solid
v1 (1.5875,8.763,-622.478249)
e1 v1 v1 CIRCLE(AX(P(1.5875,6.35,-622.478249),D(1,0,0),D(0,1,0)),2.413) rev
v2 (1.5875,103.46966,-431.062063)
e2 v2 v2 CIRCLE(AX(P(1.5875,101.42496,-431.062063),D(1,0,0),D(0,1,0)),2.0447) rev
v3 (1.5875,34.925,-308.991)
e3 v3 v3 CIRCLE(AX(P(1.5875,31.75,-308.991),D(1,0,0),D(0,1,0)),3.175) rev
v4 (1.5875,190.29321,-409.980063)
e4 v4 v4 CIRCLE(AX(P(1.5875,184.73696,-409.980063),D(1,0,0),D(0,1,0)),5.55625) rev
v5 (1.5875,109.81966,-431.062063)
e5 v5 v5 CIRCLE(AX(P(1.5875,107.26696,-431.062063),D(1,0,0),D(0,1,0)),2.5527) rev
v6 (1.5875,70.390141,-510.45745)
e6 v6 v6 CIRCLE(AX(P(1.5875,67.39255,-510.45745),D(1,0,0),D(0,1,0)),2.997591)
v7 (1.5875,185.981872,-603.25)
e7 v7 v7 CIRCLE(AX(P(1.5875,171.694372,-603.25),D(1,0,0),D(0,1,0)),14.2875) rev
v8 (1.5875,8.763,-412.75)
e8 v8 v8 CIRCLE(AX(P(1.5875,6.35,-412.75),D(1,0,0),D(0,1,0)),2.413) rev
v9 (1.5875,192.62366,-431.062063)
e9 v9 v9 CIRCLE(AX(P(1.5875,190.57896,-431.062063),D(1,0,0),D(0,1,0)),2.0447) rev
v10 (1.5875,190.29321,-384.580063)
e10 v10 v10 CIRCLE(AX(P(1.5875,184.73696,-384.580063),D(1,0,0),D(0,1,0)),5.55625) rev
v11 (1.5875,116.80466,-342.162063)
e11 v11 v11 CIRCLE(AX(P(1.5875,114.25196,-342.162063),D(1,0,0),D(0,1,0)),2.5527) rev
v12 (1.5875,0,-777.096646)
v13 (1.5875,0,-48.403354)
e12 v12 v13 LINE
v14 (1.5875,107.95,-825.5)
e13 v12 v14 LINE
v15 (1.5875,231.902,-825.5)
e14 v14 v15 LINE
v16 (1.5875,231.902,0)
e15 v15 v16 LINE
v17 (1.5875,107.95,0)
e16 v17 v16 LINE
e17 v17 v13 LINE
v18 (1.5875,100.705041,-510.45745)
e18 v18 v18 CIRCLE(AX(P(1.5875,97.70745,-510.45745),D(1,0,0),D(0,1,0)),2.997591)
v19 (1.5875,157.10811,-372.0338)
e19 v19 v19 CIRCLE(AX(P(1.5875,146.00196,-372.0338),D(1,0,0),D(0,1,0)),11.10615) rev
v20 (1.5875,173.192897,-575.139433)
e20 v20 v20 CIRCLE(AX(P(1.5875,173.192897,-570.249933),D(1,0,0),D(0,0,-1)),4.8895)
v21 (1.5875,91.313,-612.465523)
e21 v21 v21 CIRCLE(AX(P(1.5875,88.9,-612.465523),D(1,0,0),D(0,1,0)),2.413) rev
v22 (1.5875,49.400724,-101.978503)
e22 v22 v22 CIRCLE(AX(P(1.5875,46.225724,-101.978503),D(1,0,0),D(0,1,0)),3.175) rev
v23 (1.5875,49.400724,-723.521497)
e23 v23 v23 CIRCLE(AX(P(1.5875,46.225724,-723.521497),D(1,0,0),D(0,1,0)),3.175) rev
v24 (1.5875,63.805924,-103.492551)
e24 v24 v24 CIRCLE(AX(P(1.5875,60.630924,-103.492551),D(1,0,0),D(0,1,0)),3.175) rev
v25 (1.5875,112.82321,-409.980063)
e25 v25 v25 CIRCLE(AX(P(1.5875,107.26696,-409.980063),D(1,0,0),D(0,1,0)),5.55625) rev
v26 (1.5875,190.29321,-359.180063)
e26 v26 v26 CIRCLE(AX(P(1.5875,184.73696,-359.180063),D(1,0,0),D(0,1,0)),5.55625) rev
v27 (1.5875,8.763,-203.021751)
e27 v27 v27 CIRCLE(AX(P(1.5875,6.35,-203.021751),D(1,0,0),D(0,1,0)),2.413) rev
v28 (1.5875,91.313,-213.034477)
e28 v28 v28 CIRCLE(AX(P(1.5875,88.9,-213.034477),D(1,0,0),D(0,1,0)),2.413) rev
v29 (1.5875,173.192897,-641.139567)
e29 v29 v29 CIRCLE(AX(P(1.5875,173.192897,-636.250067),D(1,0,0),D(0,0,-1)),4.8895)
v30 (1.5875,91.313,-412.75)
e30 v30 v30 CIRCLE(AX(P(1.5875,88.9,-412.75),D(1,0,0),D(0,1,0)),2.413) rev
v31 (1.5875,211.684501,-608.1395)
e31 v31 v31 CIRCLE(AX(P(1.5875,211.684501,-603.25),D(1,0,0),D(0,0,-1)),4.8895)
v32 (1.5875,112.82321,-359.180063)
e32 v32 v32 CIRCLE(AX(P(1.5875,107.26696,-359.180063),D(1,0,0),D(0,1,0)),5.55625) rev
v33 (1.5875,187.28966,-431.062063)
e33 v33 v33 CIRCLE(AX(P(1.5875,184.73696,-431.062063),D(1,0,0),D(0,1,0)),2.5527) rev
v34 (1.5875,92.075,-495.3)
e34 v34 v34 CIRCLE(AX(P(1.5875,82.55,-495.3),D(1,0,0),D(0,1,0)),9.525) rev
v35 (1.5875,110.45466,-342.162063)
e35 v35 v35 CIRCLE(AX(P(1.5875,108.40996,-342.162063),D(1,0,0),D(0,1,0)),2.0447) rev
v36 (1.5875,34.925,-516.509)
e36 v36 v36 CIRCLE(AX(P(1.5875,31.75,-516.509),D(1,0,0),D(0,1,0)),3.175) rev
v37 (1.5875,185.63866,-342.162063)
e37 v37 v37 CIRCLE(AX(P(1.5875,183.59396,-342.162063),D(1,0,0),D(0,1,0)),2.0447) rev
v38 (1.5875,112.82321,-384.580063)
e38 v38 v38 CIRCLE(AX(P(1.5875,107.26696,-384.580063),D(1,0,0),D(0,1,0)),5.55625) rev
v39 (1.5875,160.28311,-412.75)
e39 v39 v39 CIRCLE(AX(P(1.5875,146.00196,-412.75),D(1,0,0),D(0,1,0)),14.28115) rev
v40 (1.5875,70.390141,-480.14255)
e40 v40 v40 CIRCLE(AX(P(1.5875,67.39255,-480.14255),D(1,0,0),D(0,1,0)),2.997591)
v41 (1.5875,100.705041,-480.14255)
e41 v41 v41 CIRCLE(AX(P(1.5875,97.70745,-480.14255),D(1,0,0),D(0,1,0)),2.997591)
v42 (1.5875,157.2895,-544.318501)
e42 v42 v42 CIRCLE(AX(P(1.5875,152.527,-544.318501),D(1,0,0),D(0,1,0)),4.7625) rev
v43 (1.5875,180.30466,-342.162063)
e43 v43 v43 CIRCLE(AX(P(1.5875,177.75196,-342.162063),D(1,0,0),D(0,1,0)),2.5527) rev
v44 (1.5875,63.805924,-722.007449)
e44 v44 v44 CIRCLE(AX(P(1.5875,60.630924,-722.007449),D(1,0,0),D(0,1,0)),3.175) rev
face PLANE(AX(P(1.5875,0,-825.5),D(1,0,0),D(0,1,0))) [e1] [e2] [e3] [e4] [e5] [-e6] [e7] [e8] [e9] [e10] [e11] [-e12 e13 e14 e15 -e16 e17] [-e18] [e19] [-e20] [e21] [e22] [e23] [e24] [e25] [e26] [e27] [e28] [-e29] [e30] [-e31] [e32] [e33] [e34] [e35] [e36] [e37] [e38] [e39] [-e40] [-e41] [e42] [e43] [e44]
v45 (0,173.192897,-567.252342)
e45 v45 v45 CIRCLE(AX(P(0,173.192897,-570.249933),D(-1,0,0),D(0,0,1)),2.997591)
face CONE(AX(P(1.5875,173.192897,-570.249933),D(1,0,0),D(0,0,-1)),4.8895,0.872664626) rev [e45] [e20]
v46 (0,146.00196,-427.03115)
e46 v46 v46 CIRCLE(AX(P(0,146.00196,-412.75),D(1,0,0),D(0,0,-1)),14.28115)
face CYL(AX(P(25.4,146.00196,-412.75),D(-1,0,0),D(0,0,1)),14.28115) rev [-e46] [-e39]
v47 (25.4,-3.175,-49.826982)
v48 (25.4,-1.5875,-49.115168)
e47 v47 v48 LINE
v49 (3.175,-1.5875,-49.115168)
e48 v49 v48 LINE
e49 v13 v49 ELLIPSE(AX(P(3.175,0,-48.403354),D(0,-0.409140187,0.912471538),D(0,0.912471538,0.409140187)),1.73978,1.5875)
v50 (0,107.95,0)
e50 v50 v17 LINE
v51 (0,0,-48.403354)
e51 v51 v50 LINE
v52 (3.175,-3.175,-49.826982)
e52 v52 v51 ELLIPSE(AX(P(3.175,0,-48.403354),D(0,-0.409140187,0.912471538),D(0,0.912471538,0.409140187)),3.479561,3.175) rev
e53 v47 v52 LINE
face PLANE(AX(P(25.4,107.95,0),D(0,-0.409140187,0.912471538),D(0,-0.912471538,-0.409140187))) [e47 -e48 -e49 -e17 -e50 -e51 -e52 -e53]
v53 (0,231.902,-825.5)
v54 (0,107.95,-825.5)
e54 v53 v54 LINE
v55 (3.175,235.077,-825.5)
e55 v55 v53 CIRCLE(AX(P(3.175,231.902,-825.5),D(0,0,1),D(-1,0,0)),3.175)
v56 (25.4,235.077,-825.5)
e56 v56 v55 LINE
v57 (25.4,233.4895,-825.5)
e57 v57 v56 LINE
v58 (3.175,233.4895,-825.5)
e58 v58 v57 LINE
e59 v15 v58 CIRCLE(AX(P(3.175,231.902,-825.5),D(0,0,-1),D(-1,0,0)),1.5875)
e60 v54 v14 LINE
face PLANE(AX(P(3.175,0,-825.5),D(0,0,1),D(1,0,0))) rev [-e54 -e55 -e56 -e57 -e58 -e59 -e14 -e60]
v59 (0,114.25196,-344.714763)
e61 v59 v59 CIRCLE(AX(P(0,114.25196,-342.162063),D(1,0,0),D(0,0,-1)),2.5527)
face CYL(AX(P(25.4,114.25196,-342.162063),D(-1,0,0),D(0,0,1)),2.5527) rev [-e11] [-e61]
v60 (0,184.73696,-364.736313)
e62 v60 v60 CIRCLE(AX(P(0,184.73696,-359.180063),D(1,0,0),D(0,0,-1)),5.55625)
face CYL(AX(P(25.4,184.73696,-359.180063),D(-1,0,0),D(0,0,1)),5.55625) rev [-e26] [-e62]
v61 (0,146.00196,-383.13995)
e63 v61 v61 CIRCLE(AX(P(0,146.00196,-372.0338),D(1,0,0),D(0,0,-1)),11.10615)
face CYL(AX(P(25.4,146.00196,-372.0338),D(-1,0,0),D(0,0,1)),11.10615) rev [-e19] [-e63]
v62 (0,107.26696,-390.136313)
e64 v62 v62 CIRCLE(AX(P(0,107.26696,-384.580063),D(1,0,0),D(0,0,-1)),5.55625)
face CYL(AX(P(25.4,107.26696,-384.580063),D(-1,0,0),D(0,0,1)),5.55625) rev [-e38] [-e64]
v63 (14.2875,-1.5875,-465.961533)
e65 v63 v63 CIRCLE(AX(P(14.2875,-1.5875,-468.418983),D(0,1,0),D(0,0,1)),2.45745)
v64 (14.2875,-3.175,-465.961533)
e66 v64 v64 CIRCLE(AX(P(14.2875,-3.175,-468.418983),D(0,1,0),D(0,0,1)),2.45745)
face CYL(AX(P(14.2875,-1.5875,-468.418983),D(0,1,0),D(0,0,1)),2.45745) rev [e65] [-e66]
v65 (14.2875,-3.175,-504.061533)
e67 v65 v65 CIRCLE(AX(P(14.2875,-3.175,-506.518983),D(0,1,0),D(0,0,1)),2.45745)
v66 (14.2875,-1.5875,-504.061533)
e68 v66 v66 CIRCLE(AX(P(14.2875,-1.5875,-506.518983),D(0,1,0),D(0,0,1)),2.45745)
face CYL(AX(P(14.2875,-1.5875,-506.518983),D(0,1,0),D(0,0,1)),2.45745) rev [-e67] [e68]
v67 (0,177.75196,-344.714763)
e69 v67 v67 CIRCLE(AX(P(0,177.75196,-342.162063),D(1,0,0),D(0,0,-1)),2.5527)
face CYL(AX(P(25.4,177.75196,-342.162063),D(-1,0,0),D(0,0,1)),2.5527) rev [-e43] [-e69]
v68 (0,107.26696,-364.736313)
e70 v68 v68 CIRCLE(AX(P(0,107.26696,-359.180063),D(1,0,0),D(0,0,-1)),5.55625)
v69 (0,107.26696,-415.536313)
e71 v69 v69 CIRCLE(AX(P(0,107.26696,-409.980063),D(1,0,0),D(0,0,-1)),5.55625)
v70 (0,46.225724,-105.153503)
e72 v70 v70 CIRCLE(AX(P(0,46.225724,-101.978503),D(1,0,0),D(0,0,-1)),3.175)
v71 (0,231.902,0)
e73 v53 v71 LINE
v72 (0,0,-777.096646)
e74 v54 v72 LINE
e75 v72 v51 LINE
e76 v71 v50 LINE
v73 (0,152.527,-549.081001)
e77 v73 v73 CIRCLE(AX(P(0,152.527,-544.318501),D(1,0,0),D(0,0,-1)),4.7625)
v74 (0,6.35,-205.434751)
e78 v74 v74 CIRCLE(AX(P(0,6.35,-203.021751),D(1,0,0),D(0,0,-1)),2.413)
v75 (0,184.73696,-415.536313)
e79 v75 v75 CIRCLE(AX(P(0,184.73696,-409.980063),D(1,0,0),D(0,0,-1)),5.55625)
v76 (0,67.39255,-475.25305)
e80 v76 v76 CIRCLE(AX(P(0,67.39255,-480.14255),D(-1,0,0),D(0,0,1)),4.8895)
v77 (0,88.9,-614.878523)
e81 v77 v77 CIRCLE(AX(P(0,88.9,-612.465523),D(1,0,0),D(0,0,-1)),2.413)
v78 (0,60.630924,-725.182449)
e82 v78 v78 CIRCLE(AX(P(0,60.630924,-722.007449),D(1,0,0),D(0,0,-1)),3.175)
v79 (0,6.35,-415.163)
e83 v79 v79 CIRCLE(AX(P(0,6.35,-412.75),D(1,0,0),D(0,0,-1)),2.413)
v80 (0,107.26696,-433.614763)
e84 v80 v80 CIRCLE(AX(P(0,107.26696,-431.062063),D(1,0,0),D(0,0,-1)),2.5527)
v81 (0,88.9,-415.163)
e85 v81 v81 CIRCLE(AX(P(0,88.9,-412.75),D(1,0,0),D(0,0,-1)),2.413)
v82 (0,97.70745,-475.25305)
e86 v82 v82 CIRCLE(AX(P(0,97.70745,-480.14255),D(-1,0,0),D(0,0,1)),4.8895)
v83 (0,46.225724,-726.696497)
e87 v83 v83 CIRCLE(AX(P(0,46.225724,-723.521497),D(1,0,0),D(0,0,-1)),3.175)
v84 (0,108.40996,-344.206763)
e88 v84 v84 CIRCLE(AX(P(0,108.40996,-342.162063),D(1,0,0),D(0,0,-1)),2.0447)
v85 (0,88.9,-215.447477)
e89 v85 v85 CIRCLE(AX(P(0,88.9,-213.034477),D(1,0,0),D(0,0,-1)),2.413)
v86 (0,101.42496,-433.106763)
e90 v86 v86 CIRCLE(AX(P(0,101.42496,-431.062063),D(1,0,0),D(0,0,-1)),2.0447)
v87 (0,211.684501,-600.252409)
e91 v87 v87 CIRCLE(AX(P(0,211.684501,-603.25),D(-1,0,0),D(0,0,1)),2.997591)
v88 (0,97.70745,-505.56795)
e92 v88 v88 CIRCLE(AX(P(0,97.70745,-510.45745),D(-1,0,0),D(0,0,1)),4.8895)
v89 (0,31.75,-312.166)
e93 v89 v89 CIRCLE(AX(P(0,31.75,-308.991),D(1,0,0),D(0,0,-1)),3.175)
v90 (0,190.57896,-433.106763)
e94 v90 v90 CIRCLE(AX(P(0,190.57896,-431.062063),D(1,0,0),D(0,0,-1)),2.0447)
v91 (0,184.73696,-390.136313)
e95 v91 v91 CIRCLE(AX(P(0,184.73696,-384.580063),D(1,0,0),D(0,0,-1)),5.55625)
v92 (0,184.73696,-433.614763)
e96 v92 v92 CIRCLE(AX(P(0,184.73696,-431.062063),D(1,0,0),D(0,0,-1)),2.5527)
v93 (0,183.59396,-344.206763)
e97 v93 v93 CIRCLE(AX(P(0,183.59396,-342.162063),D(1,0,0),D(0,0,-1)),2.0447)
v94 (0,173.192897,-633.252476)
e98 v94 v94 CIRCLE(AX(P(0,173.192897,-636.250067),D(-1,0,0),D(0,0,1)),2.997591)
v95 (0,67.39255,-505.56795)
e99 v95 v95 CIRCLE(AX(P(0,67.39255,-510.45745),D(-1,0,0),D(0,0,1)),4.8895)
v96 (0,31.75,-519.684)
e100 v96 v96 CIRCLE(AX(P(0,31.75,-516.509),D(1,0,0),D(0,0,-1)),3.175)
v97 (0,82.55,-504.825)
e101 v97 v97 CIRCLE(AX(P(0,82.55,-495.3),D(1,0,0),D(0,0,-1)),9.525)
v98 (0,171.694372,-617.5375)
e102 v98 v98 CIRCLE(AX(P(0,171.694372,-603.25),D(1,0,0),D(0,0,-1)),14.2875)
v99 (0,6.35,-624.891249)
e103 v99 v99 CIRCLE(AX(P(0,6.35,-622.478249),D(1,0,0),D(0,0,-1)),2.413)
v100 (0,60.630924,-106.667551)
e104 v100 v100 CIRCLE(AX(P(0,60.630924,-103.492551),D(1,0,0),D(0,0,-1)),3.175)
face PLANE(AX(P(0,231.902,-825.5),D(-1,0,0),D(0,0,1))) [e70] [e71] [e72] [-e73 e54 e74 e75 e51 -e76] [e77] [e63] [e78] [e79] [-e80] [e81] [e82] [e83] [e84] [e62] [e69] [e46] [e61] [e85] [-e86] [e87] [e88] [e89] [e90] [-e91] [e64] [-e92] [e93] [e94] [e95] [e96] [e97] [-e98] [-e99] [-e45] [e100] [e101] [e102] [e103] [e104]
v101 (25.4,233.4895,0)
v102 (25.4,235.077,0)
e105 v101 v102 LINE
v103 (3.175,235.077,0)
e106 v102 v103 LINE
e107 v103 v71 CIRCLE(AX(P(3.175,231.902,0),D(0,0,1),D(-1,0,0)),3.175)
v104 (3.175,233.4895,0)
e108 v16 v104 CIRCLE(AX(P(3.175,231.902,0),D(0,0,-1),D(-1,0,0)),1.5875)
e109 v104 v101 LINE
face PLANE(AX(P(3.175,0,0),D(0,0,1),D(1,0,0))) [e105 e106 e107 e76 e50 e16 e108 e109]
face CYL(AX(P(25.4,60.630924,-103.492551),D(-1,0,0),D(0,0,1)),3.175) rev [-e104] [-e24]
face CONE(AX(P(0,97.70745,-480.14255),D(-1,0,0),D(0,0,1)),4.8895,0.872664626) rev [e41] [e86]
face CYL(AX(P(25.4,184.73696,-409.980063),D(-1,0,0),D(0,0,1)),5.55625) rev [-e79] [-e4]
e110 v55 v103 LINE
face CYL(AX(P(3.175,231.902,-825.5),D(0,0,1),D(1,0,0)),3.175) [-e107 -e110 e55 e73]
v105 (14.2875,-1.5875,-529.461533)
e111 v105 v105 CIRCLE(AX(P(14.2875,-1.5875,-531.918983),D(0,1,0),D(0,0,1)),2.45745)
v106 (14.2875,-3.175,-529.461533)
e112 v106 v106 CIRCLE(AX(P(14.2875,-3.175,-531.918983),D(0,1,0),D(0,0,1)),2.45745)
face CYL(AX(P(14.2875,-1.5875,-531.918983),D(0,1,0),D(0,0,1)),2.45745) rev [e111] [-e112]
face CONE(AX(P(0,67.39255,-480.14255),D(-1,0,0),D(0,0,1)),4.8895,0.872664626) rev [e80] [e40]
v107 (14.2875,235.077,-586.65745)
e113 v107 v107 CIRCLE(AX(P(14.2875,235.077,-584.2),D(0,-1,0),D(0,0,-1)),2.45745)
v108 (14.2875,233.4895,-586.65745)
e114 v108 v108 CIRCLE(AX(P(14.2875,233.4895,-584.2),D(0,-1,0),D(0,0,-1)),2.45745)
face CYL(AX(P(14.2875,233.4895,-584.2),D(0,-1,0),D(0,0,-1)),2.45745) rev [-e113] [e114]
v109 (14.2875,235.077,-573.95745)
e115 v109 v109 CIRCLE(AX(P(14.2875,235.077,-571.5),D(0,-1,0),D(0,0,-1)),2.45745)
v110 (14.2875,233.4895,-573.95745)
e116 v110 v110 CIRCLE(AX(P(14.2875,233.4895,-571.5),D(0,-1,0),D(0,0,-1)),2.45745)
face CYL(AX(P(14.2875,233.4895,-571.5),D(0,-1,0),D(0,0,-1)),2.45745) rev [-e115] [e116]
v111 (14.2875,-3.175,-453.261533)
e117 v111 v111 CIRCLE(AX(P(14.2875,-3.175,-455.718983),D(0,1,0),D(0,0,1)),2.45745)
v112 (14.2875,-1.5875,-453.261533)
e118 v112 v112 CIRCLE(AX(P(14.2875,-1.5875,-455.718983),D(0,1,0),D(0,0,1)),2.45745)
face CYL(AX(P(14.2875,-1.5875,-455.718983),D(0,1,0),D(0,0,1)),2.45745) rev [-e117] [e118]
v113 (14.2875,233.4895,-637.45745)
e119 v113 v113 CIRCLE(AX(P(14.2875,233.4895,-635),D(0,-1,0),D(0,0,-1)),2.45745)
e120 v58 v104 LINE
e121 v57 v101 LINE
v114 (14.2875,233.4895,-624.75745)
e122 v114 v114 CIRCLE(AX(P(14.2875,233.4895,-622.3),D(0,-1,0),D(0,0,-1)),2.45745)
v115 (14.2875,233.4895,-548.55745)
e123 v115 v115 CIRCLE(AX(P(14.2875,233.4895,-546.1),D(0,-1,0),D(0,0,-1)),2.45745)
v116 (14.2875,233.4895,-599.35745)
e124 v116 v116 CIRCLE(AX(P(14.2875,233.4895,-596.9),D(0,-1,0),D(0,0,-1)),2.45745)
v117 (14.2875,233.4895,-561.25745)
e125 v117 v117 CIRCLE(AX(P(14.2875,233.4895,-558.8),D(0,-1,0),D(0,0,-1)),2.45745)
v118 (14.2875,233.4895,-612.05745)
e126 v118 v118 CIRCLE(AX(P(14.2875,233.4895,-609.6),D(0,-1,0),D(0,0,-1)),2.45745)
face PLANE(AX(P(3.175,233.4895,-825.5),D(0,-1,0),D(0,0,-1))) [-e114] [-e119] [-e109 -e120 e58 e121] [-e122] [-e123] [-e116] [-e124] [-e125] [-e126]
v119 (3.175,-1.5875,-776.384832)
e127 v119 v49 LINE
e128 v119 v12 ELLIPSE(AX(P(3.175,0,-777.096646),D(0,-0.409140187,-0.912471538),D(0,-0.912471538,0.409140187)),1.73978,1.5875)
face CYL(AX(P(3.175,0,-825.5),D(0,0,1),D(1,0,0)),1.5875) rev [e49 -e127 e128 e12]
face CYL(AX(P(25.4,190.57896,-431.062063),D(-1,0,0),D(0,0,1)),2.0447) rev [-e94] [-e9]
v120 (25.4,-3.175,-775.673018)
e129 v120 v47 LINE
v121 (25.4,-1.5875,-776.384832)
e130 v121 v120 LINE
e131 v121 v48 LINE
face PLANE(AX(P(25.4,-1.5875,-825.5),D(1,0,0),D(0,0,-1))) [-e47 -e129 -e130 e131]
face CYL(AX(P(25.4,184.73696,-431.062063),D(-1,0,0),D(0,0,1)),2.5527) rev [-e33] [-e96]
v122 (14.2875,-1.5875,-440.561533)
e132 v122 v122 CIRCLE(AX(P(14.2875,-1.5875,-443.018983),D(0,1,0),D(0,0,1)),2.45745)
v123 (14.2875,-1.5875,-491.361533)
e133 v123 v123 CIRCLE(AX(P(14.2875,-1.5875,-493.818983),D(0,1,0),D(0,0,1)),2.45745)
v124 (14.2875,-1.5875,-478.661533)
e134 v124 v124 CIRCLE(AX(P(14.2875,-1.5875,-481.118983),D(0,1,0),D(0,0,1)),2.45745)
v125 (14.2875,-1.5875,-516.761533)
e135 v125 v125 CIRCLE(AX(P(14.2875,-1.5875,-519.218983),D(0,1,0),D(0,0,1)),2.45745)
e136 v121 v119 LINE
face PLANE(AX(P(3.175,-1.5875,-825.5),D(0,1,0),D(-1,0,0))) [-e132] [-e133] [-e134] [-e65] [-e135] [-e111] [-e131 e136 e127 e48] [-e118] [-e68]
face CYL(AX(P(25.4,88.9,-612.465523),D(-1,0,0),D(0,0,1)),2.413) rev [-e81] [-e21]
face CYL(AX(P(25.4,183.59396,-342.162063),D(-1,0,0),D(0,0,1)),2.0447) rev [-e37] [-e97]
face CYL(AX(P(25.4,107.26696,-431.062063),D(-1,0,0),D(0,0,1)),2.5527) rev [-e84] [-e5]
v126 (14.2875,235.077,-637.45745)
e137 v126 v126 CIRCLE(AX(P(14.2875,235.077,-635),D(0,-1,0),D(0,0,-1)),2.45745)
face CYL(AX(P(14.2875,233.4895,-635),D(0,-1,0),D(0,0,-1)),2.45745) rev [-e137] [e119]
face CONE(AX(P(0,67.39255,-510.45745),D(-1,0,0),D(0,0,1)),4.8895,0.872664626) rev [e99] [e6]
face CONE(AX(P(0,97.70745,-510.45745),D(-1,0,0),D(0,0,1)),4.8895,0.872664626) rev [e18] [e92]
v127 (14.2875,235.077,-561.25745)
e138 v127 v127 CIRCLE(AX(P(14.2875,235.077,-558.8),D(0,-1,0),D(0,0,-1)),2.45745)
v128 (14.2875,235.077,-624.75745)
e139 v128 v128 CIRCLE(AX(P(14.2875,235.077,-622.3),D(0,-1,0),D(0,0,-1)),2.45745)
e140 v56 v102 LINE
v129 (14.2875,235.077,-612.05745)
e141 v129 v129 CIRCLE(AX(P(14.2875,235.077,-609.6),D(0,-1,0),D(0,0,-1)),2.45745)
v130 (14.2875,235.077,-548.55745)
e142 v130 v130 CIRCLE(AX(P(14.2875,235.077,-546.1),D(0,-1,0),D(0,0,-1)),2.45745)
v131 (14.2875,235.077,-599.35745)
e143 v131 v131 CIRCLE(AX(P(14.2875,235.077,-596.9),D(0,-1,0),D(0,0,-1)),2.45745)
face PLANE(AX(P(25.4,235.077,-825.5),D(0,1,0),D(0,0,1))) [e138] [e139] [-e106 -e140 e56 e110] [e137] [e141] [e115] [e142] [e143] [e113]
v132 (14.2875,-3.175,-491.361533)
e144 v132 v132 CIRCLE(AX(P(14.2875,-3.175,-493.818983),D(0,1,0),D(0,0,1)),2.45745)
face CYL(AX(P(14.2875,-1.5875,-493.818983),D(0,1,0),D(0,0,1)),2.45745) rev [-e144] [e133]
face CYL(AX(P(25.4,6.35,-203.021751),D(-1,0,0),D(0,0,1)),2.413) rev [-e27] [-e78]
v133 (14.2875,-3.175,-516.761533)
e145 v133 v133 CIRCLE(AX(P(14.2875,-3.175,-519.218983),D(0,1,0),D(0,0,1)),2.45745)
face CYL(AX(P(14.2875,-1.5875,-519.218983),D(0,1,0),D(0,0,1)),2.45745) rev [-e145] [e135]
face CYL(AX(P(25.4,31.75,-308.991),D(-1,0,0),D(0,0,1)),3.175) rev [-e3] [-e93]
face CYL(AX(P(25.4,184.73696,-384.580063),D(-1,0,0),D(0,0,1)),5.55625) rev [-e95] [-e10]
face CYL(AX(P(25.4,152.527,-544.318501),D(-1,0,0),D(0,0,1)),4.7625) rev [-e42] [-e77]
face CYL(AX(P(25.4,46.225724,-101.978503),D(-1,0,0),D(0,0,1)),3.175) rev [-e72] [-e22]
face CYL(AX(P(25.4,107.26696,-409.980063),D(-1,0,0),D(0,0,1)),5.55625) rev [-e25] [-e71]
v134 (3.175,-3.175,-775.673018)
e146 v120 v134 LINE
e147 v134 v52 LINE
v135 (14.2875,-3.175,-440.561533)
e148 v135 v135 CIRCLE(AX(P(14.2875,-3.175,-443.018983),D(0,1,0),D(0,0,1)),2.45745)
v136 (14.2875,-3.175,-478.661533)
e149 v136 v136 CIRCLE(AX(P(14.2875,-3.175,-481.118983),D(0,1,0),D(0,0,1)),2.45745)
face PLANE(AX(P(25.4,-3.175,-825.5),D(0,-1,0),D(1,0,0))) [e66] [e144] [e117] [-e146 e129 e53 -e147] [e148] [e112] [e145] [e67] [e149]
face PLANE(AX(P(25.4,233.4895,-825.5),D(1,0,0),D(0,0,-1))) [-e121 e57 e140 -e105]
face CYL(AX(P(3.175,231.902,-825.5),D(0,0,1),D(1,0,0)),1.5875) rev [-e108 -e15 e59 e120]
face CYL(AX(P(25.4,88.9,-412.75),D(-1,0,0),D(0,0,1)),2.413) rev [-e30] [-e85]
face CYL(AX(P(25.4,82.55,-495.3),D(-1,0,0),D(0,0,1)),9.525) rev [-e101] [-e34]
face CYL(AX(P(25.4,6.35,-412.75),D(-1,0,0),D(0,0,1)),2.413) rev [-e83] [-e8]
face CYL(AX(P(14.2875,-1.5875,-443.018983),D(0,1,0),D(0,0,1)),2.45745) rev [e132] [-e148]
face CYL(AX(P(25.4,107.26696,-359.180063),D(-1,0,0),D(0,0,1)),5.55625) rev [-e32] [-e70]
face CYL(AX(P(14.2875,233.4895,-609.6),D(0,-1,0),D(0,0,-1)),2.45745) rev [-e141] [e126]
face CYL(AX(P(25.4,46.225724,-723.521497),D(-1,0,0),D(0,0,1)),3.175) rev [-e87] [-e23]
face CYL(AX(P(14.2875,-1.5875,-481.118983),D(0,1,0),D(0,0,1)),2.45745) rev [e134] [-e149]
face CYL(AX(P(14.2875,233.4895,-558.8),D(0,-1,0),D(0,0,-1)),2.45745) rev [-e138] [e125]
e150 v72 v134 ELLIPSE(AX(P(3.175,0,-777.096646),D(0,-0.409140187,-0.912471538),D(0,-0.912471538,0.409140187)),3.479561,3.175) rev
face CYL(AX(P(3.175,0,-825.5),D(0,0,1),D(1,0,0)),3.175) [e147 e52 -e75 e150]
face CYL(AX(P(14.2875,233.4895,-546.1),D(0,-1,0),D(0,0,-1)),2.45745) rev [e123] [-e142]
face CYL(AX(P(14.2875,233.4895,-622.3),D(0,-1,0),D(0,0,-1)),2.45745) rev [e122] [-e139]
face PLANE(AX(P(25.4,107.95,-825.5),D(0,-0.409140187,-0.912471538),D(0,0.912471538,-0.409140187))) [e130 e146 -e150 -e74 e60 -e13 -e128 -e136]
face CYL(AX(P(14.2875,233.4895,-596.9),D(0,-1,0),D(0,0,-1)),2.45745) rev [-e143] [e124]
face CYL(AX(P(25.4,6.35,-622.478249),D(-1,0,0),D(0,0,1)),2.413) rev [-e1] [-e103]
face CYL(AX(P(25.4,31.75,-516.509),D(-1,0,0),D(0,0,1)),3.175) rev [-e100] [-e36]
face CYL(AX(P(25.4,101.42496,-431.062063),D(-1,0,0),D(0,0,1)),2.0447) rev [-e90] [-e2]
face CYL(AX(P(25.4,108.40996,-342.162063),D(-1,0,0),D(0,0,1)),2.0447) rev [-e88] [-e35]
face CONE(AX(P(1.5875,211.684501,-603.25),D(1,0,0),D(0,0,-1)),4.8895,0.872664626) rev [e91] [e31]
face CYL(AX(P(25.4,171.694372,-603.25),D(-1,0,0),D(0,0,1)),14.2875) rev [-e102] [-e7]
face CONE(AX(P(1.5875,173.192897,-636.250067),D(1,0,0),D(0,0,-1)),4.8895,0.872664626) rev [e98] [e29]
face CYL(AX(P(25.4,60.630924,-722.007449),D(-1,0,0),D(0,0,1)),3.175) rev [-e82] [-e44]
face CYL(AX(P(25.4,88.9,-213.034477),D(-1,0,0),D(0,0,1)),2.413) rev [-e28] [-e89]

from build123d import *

# Parameters (mm, degrees)
BASE_FLANGE2_DEPTH                                 = 825.5
SKETCH1_R                                          = 3.175
SKETCH1_R_2                                        = 2.413
SKETCH1_R_3                                        = 5.55625
SKETCH1_R_4                                        = 2.5527
SKETCH1_R_5                                        = 2.0447
SKETCH1_R_6                                        = 14.28115
SKETCH1_R_7                                        = 11.10615
SKETCH1_R_8                                        = 1.5875
SKETCH1_R_9                                        = 9.525
SKETCH1_R_10                                       = 1.27
SKETCH1_R_11                                       = 14.2875
SKETCH1_R_12                                       = 4.7625
CUT_EXTRUDE3_DEPTH                                 = 859.694710551
CSK_FOR_10_FLAT_HEAD_MACHINE_SCREW_100_D           = 4.9784
CSK_FOR_10_FLAT_HEAD_MACHINE_SCREW_100_CSINK_D     = 9.779
CSK_FOR_10_FLAT_HEAD_MACHINE_SCREW_100_CSINK_ANGLE = 100
CSK_FOR_10_FLAT_HEAD_MACHINE_SCREW_2_AT_COUNT      = 2
CSK_FOR_10_FLAT_HEAD_MACHINE_SCREW_2_AT_PITCH      = 50.701163977
CSK_FOR_10_FLAT_HEAD_MACHINE_SCREW_3_COUNT         = 2
CSK_FOR_10_FLAT_HEAD_MACHINE_SCREW_3_PITCH         = 50.701163977
SKETCH10_R                                         = 0.635
CUT_EXTRUDE4_DEPTH                                 = 860.130662682
F_8_CLEARANCE_HOLE1_D                              = 4.9149
F_8_CLEARANCE_HOLE1_DEPTH                          = 1.5875
F_8_CLEARANCE_HOLE2_D                              = 4.9149
F_8_CLEARANCE_HOLE2_DEPTH                          = 1.5875


# Sheet-metal steps are written as plain solids
with BuildPart() as part:
    # Sketch3 → Base-Flange2 (new body)
    with BuildSketch(Plane.XY):
        with BuildLine():
            Line((3.175, 233.4895), (25.4, 233.4895))
            Line((25.4, 233.4895), (25.4, 235.077))
            Line((25.4, 235.077), (3.175, 235.077))
            ThreePointArc((3.175, 235.077), (0.92993597, 234.14706403), (0, 231.902))
            Line((0, 231.902), (0, 0))
            ThreePointArc((0, 0), (0.92993597, -2.24506403), (3.175, -3.175))
            Line((3.175, -3.175), (25.4, -3.175))
            Line((25.4, -3.175), (25.4, -1.5875))
            Line((25.4, -1.5875), (3.175, -1.5875))
            ThreePointArc((3.175, -1.5875), (2.052467985, -1.122532015), (1.5875, 0))
            Line((1.5875, 0), (1.5875, 231.902))
            ThreePointArc((1.5875, 231.902), (2.052467985, 233.024532015), (3.175, 233.4895))
        make_face()
    extrude(amount=-BASE_FLANGE2_DEPTH)

    # Sketch1 → Cut-Extrude3 (cut, through all)
    with BuildSketch(Plane(origin=(0, 0, 0), x_dir=(0, 0, -1), z_dir=(1, 0, 0))):
        with Locations(Location((516.509, 31.75, 0), (0, 0, 90))):
            Circle(SKETCH1_R)
        with Locations(Location((308.991, 31.75, 0), (0, 0, 90))):
            Circle(SKETCH1_R)
        with Locations(Location((103.492550911, 60.630923565, 0), (0, 0, 90))):
            Circle(SKETCH1_R)
        with Locations(Location((722.007449089, 60.630923565, 0), (0, 0, 90))):
            Circle(SKETCH1_R)
        with Locations(Location((412.75, 6.35, 0), (0, 0, 90))):
            Circle(SKETCH1_R_2)
        with Locations(Location((412.75, 88.9, 0), (0, 0, 90))):
            Circle(SKETCH1_R_2)
        with Locations(Location((622.478249316, 6.35, 0), (0, 0, 90))):
            Circle(SKETCH1_R_2)
        with Locations(Location((612.465522577, 88.9, 0), (0, 0, 90))):
            Circle(SKETCH1_R_2)
        with Locations(Location((203.021750684, 6.35, 0), (0, 0, 90))):
            Circle(SKETCH1_R_2)
        with Locations(Location((101.978503418, 46.225723918, 0), (0, 0, 90))):
            Circle(SKETCH1_R)
        with Locations(Location((723.521496582, 46.225723918, 0), (0, 0, 90))):
            Circle(SKETCH1_R)
        with Locations(Location((213.034477423, 88.9, 0), (0, 0, 90))):
            Circle(SKETCH1_R_2)
        with Locations(Location((359.180063087, 107.266959746, 0), (0, 0, 90))):
            Circle(SKETCH1_R_3)
        with Locations(Location((342.162063087, 114.251959746, 0), (0, 0, 90))):
            Circle(SKETCH1_R_4)
        with Locations(Location((342.162063087, 108.409959746, 0), (0, 0, 90))):
            Circle(SKETCH1_R_5)
        with Locations(Location((342.162063087, 177.751959746, 0), (0, 0, 90))):
            Circle(SKETCH1_R_4)
        with Locations(Location((342.162063087, 183.593959746, 0), (0, 0, 90))):
            Circle(SKETCH1_R_5)
        with Locations(Location((359.180063087, 184.736959746, 0), (0, 0, 90))):
            Circle(SKETCH1_R_3)
        with Locations(Location((384.580063087, 184.736959746, 0), (0, 0, 90))):
            Circle(SKETCH1_R_3)
        with Locations(Location((409.980063087, 184.736959746, 0), (0, 0, 90))):
            Circle(SKETCH1_R_3)
        with Locations(Location((431.062063087, 184.736959746, 0), (0, 0, 90))):
            Circle(SKETCH1_R_4)
        with Locations(Location((431.062063087, 190.578959746, 0), (0, 0, 90))):
            Circle(SKETCH1_R_5)
        with Locations(Location((431.062063087, 107.266959746, 0), (0, 0, 90))):
            Circle(SKETCH1_R_4)
        with Locations(Location((431.062063087, 101.424959746, 0), (0, 0, 90))):
            Circle(SKETCH1_R_5)
        with Locations(Location((412.75, 146.001959746, 0), (0, 0, 90))):
            Circle(SKETCH1_R_6)
        with Locations(Location((372.0338, 146.001959746, 0), (0, 0, 90))):
            Circle(SKETCH1_R_7)
        with Locations(Location((384.580063087, 107.266959746, 0), (0, 0, 90))):
            Circle(SKETCH1_R_3)
        with Locations(Location((409.980063087, 107.266959746, 0), (0, 0, 90))):
            Circle(SKETCH1_R_3)
        with Locations(Location((480.14255, 67.39255, 0), (0, 0, 90))):
            Circle(SKETCH1_R_8)
        with Locations(Location((510.45745, 67.39255, 0), (0, 0, 90))):
            Circle(SKETCH1_R_8)
        with Locations(Location((510.45745, 97.70745, 0), (0, 0, 90))):
            Circle(SKETCH1_R_8)
        with Locations(Location((480.14255, 97.70745, 0), (0, 0, 90))):
            Circle(SKETCH1_R_8)
        with Locations(Location((495.3, 82.55, 0), (0, 0, 90))):
            Circle(SKETCH1_R_9)
        with Locations(Location((636.250067105, 173.192896507, 0), (0, 0, 90))):
            Circle(SKETCH1_R_10)
        with Locations(Location((603.25, 171.694372229, 0), (0, 0, 90))):
            Circle(SKETCH1_R_11)
        with Locations(Location((570.249932895, 173.192896507, 0), (0, 0, 90))):
            Circle(SKETCH1_R_10)
        with Locations(Location((603.25, 211.684500783, 0), (0, 0, 90))):
            Circle(SKETCH1_R_10)
        with Locations(Location((544.318501255, 152.527, 0), (0, 0, 90))):
            Circle(SKETCH1_R_12)
        Polygon((825.5, -3.175), (775.673017562, -3.175), (825.5, 107.95), align=None)
        Polygon((0, 107.95), (49.826982438, -3.175), (0, -3.175), align=None)
    extrude(amount=CUT_EXTRUDE3_DEPTH, mode=Mode.SUBTRACT)

    # CSK for _10 Flat Head Machine Screw _100 (through all)
    with Locations(Plane.ZY):
        with Locations((-510.45745, 97.70745), (-480.14255, 97.70745), (-480.14255, 67.39255), (-510.45745, 67.39255)):
            CounterSinkHole(CSK_FOR_10_FLAT_HEAD_MACHINE_SCREW_100_D / 2, CSK_FOR_10_FLAT_HEAD_MACHINE_SCREW_100_CSINK_D / 2, counter_sink_angle=CSK_FOR_10_FLAT_HEAD_MACHINE_SCREW_100_CSINK_ANGLE)

    # Sketch8 → CSK for _10 Flat Head Machine Screw  2 (revolve, cut)
    with BuildSketch(Plane(origin=(1.5875, 211.684500783, -603.25), x_dir=(0, 0, -1), z_dir=(0, 1, 0))):
        Polygon((0, 0), (0, 1.5875), (2.4892, 1.5875), (2.4892, 2.014090845), (4.8895, 0), align=None)
    csk_for_10_flat_head_machine_screw_2 = revolve(axis=Axis((7.9375, 211.684500783, -603.25), (-1, 0, 0)), mode=Mode.SUBTRACT)

    # CSK for _10 Flat Head Machine Screw 2 at: CSK for _10 Flat Head Machine Screw  2 ×2
    with Locations(*[Vector(0, -0.7591858106628883, -0.6508739546856467) * (i * CSK_FOR_10_FLAT_HEAD_MACHINE_SCREW_2_AT_PITCH) for i in range(1, CSK_FOR_10_FLAT_HEAD_MACHINE_SCREW_2_AT_COUNT)]):
        add(csk_for_10_flat_head_machine_screw_2, mode=Mode.SUBTRACT)

    # CSK for _10 Flat Head Machine Screw  3: CSK for _10 Flat Head Machine Screw  2 ×2
    with Locations(*[Vector(0, -0.7591858106628849, 0.6508739546856506) * (i * CSK_FOR_10_FLAT_HEAD_MACHINE_SCREW_3_PITCH) for i in range(1, CSK_FOR_10_FLAT_HEAD_MACHINE_SCREW_3_COUNT)]):
        add(csk_for_10_flat_head_machine_screw_2, mode=Mode.SUBTRACT)

    # Sketch10 → Cut-Extrude4 (cut, through all)
    with BuildSketch(Plane(origin=(0, -1.5875, 0), x_dir=(1, 0, 0), z_dir=(0, 1, 0))):
        with Locations(Location((14.2875, 443.018983217, 0), (0, 0, 180))):
            Circle(SKETCH10_R)
        with Locations(Location((14.2875, 455.718983217, 0), (0, 0, 180))):
            Circle(SKETCH10_R)
        with Locations(Location((14.2875, 468.418983217, 0), (0, 0, 180))):
            Circle(SKETCH10_R)
        with Locations(Location((14.2875, 481.118983217, 0), (0, 0, 180))):
            Circle(SKETCH10_R)
        with Locations(Location((14.2875, 493.818983217, 0), (0, 0, 180))):
            Circle(SKETCH10_R)
        with Locations(Location((14.2875, 506.518983217, 0), (0, 0, 180))):
            Circle(SKETCH10_R)
        with Locations(Location((14.2875, 519.218983217, 0), (0, 0, 180))):
            Circle(SKETCH10_R)
        with Locations(Location((14.2875, 531.918983217, 0), (0, 0, 180))):
            Circle(SKETCH10_R)
    extrude(amount=-CUT_EXTRUDE4_DEPTH, mode=Mode.SUBTRACT)

    # #8 Clearance Hole1
    with Locations(Plane(origin=(0, -1.5875, 0), x_dir=(1, 0, 0), z_dir=(0, 1, 0))):
        with Locations((14.2875, 531.918983217), (14.2875, 519.218983217), (14.2875, 506.518983217), (14.2875, 493.818983217), (14.2875, 481.118983217), (14.2875, 468.418983217), (14.2875, 455.718983217), (14.2875, 443.018983217)):
            Hole(F_8_CLEARANCE_HOLE1_D / 2, depth=F_8_CLEARANCE_HOLE1_DEPTH)

    # #8 Clearance Hole2
    with Locations(Plane(origin=(0, 233.4895, 0), x_dir=(-1, 0, 0), z_dir=(0, -1, 0))):
        with Locations((-14.2875, 558.8), (-14.2875, 546.1), (-14.2875, 571.5), (-14.2875, 584.2), (-14.2875, 596.9), (-14.2875, 609.6), (-14.2875, 622.3), (-14.2875, 635)):
            Hole(F_8_CLEARANCE_HOLE2_D / 2, depth=F_8_CLEARANCE_HOLE2_DEPTH)


solid = part.part
